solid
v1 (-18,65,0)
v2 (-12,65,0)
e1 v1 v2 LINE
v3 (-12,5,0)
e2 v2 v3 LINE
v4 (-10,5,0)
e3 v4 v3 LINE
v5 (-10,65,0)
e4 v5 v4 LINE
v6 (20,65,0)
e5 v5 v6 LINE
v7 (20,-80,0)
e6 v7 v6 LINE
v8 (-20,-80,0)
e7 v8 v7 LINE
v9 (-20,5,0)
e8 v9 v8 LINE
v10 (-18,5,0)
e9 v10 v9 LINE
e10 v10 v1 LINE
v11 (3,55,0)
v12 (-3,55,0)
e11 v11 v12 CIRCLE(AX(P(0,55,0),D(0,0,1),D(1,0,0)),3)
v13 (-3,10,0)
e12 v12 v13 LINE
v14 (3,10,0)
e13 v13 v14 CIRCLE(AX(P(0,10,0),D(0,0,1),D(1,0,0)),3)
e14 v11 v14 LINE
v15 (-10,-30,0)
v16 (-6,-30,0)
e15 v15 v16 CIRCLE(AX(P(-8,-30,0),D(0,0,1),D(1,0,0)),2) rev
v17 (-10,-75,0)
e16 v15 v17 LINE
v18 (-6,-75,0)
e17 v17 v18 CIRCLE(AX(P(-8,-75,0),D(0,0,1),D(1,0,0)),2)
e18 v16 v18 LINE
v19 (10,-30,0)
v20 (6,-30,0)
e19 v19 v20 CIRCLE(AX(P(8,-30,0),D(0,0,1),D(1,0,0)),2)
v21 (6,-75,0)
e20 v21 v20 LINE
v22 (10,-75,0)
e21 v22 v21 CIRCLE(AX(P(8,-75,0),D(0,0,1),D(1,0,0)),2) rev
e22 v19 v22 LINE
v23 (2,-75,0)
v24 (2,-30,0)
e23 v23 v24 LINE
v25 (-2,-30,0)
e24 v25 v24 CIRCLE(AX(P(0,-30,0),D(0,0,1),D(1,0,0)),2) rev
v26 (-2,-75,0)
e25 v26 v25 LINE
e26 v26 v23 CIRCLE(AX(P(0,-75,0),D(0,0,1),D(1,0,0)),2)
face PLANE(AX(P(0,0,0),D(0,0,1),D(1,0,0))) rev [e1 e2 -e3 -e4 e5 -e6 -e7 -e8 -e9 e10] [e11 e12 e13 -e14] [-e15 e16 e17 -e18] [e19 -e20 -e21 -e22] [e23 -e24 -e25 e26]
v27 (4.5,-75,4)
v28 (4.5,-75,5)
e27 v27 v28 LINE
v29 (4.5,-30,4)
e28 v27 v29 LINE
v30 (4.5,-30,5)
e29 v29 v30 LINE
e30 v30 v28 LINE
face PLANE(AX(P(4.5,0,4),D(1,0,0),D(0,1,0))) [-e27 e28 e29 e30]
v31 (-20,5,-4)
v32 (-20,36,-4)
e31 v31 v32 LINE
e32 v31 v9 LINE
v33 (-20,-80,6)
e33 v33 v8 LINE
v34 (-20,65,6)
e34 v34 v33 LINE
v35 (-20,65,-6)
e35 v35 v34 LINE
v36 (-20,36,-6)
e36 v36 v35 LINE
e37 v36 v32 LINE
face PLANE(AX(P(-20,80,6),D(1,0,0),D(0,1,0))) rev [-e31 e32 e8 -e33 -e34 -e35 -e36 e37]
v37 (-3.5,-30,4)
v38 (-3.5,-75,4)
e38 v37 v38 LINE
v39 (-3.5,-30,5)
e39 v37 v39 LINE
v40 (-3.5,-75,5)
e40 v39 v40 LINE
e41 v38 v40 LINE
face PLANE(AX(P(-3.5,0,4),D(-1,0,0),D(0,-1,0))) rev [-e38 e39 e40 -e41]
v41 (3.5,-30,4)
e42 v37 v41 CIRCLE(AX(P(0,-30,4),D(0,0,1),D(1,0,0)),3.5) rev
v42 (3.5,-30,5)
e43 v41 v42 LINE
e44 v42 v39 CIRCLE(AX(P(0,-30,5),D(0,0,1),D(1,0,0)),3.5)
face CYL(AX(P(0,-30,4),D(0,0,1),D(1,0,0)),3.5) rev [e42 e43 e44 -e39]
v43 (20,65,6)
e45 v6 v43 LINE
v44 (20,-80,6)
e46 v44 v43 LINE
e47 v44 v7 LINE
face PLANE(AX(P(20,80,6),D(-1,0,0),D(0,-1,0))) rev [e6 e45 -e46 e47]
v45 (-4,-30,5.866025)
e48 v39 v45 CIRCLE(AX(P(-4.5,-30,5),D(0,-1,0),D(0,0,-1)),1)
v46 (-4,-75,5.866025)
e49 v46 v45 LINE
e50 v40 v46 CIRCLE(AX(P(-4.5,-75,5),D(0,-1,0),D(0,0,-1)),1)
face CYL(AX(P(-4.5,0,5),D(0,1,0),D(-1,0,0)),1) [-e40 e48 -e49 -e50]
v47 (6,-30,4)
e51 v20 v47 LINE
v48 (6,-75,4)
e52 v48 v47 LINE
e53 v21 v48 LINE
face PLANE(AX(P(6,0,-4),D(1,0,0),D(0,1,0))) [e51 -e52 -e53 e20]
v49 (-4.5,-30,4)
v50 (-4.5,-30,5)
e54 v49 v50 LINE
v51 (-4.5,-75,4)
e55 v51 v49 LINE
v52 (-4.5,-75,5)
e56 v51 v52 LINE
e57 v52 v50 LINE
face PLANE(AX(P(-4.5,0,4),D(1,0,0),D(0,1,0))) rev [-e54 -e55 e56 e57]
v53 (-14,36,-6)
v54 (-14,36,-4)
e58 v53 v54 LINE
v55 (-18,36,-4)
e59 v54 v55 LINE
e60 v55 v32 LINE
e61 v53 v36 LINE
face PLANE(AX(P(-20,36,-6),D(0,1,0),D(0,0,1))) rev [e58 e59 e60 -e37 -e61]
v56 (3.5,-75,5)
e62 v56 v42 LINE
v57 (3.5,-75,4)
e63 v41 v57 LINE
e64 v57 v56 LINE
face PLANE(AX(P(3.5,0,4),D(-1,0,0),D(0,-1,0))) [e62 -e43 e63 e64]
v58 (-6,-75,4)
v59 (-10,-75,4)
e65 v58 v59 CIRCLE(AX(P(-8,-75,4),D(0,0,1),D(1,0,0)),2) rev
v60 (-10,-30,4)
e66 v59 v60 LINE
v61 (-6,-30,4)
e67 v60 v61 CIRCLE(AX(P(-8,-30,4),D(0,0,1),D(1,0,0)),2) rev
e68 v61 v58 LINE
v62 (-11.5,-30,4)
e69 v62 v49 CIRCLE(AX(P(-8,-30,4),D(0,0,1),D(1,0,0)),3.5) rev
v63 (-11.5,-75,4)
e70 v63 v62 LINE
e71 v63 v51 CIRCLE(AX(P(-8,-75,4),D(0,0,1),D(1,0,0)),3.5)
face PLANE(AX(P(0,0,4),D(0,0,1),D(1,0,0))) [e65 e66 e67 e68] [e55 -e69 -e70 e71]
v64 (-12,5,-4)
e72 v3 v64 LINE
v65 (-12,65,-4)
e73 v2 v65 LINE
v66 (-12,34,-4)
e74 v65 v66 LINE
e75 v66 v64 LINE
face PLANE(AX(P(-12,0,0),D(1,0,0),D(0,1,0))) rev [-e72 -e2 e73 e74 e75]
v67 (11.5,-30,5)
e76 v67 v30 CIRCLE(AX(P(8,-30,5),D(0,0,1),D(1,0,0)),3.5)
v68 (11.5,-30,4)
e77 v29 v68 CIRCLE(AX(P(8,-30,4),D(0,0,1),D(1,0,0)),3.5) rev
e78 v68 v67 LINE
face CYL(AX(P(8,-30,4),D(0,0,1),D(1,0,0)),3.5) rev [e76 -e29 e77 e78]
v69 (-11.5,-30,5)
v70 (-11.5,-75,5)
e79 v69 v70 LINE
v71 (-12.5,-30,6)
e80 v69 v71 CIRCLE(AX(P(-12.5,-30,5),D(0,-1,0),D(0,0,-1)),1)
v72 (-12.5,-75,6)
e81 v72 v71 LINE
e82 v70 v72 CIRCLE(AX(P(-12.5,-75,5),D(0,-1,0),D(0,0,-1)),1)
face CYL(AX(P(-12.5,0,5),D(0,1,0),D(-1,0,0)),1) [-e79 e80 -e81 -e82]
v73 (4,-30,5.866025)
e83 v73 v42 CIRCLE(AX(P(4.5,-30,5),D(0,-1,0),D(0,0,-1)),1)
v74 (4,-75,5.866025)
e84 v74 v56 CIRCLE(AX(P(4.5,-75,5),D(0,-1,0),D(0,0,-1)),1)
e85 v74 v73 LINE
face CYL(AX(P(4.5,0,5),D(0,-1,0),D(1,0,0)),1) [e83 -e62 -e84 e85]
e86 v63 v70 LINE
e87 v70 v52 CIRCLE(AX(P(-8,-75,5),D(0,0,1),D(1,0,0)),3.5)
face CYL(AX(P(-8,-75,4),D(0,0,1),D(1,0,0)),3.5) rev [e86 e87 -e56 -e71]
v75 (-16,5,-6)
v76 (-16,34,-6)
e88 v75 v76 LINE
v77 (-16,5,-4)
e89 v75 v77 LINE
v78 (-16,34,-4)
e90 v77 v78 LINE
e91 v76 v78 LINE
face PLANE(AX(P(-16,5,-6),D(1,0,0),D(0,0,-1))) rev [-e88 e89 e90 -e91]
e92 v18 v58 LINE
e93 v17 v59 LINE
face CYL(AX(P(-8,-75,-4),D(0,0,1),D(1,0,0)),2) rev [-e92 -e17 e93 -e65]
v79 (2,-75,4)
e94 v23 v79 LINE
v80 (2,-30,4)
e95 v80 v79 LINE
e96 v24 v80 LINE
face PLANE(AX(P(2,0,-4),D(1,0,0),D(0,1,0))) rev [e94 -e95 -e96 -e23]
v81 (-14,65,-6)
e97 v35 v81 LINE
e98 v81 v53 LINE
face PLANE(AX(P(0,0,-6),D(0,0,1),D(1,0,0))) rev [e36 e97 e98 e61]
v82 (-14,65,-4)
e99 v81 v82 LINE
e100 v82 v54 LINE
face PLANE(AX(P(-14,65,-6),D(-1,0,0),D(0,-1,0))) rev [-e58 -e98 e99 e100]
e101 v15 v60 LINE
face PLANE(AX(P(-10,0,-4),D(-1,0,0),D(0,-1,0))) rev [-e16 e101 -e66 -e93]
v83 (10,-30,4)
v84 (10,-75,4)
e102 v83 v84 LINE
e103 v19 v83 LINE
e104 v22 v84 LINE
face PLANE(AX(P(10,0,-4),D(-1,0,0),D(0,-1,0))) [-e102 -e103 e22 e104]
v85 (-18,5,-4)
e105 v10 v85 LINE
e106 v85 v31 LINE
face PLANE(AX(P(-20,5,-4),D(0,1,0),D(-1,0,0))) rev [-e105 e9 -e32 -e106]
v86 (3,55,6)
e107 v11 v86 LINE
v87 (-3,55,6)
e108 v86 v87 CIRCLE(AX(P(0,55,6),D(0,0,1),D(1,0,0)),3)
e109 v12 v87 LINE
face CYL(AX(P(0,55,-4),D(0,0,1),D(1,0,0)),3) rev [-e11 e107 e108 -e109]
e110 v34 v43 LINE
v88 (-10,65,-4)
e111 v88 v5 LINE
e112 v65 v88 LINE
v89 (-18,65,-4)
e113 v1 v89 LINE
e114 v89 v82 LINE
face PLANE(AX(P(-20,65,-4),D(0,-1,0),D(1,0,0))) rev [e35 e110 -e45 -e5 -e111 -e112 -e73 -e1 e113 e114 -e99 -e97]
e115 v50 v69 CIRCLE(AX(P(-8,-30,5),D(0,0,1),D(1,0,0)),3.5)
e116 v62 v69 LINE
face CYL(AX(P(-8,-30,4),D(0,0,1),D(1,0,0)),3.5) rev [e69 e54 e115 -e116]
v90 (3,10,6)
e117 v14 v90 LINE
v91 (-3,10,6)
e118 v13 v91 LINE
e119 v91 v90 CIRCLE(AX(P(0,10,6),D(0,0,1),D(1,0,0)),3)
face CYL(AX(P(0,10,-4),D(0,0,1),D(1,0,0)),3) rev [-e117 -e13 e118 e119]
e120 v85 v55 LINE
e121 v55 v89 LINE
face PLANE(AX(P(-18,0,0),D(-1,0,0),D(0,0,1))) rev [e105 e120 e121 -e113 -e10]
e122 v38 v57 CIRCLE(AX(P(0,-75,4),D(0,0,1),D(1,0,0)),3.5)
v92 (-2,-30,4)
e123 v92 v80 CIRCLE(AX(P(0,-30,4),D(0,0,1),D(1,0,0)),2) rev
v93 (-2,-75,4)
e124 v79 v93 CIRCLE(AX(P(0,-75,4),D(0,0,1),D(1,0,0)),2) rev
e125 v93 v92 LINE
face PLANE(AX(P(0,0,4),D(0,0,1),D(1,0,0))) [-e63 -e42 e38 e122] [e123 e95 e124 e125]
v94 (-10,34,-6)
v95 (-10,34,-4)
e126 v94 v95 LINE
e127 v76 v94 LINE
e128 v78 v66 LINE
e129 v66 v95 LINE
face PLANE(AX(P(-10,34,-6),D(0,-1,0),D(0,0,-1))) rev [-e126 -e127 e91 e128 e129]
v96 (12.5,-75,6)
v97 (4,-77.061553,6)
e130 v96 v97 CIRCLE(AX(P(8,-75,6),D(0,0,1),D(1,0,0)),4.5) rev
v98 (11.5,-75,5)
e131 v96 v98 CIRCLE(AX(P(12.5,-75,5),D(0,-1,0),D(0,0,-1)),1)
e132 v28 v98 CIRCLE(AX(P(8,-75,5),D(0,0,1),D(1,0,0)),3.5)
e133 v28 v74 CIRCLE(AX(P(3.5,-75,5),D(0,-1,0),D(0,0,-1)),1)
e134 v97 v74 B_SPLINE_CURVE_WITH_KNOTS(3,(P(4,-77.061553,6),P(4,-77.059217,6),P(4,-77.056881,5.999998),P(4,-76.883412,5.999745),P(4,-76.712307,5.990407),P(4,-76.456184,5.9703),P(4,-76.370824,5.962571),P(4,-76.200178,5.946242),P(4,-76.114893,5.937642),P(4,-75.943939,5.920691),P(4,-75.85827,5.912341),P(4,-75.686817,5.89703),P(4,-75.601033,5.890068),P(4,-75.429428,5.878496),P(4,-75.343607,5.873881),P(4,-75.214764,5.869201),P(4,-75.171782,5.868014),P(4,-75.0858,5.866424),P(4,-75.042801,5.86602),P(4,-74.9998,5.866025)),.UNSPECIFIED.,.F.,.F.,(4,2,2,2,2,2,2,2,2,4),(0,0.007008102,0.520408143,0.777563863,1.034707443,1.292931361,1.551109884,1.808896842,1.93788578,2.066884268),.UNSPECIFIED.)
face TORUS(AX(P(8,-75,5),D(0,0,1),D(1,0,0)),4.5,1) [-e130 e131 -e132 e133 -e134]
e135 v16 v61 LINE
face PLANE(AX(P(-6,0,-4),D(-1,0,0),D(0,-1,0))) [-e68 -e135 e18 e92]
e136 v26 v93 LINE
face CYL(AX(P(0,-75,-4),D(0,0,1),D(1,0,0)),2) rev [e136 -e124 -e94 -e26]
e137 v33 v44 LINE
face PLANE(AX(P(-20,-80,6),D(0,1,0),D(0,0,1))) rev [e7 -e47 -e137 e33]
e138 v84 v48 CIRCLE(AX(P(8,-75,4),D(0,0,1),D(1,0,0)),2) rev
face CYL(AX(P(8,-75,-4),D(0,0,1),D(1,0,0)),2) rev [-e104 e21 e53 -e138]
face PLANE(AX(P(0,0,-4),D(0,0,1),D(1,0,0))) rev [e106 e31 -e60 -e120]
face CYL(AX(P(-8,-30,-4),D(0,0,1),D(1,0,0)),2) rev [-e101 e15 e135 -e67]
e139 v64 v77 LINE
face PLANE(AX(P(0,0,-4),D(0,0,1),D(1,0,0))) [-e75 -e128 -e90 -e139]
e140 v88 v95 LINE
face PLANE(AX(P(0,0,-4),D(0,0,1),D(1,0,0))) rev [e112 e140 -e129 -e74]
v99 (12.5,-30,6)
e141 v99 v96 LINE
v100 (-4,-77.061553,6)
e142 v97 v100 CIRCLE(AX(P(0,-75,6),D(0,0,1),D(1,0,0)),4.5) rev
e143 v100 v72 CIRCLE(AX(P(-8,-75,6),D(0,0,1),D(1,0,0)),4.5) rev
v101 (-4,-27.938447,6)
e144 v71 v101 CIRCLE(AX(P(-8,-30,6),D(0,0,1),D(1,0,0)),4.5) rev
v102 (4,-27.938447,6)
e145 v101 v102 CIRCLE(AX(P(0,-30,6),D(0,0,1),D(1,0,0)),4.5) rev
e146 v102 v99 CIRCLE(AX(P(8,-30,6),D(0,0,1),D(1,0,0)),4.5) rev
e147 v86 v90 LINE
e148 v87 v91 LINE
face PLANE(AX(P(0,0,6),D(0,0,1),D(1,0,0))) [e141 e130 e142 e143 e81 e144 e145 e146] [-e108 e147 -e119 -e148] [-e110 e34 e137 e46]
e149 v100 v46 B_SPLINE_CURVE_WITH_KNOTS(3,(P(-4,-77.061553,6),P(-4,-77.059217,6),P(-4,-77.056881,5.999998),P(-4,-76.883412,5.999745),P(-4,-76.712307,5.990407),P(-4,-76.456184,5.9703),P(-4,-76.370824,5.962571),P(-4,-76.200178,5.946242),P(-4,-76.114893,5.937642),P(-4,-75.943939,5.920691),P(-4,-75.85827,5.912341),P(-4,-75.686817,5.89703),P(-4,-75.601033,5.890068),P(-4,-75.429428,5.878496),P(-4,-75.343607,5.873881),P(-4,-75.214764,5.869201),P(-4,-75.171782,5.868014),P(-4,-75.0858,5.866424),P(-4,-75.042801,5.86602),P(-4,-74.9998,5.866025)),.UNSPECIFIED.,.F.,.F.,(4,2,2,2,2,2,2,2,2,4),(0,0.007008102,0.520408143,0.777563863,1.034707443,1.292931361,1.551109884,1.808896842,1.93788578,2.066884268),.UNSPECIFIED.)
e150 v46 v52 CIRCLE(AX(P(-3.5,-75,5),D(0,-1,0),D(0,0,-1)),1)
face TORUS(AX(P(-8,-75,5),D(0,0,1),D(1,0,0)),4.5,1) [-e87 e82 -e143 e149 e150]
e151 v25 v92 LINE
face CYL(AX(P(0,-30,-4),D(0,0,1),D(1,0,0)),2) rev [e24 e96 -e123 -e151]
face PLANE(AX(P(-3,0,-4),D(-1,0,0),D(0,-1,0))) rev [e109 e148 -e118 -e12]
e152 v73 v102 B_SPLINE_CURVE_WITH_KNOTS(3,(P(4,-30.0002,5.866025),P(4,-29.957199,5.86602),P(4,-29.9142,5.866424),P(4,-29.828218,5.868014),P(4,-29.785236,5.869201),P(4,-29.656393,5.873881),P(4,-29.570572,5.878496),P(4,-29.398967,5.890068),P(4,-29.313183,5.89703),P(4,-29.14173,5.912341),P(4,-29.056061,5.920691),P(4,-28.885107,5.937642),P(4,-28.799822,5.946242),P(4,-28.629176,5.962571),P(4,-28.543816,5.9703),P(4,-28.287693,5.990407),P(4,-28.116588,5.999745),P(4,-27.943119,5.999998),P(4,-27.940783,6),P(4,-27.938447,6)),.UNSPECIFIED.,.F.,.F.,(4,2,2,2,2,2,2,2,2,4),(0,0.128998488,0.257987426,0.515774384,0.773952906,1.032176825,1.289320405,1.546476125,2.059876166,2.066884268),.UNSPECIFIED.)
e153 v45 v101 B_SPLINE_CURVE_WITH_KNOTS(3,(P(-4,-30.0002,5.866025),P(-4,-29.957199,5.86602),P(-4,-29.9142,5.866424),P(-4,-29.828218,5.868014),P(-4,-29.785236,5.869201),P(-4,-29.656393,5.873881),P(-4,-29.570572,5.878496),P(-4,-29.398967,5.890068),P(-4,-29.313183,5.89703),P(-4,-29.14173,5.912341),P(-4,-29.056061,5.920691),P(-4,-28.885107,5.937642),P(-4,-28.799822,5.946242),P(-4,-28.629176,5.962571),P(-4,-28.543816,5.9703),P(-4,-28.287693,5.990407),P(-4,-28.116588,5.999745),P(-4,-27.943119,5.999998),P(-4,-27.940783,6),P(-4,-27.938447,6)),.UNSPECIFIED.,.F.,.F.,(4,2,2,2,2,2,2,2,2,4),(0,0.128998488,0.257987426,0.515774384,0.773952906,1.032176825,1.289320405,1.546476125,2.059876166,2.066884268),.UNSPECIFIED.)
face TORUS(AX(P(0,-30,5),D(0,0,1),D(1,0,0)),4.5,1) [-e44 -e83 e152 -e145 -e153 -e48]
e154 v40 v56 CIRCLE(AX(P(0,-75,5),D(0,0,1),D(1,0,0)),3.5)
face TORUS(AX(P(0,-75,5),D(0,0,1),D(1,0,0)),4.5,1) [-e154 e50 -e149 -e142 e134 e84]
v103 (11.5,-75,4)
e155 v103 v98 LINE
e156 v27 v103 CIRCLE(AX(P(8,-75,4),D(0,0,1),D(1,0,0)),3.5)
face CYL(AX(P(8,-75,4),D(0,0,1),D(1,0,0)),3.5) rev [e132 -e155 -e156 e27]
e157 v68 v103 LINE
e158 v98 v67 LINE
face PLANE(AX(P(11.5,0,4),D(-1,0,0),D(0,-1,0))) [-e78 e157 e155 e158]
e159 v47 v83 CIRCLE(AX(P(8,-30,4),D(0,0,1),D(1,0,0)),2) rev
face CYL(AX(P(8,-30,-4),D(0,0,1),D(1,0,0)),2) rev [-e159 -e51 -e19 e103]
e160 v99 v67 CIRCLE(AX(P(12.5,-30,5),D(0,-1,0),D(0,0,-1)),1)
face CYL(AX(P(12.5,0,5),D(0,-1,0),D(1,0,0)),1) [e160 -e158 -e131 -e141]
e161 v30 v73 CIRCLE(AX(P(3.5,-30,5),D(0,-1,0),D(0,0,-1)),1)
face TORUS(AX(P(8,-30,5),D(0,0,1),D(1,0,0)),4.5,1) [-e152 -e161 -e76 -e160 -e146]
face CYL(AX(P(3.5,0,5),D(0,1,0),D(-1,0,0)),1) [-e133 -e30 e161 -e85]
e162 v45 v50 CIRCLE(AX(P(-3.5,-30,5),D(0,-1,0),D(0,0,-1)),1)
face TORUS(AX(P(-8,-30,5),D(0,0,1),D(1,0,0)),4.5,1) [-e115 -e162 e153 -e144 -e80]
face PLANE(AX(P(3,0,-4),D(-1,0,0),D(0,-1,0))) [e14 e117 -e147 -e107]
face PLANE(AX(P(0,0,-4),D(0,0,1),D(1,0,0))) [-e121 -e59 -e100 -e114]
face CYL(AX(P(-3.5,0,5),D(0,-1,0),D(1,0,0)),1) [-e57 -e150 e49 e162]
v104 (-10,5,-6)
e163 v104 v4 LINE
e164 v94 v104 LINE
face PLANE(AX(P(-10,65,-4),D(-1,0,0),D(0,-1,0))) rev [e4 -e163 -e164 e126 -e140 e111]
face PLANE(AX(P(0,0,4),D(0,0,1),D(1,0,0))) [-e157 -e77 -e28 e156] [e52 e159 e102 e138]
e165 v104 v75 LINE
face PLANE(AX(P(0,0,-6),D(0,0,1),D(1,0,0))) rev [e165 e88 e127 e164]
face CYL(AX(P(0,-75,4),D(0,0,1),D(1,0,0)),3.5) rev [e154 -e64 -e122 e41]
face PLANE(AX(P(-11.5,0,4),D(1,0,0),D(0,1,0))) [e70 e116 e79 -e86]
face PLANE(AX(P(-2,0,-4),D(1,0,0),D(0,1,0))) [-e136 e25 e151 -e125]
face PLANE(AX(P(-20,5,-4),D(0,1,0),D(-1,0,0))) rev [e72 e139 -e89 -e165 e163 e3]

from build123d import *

# Parameters (mm, degrees)
SKETCH_1_W          = 40
SKETCH_1_H          = 160
EXTRUDE_2_DEPTH     = 6
CUT_EXTRUDE_3_DEPTH = 10
SKETCH_5_W          = 40
SKETCH_5_H          = 15
CUT_EXTRUDE_4_DEPTH = 10
CUT_EXTRUDE_5_DEPTH = 10
CUT_EXTRUDE_6_DEPTH = 2
FILLET_1_R          = 1
SKETCH_10_W         = 10
SKETCH_10_H         = 60
EXTRUDE_3_DEPTH     = 4
SKETCH_11_W         = 6
SKETCH_11_H         = 60
CUT_EXTRUDE_7_DEPTH = 4
SKETCH_13_W         = 6
SKETCH_13_H         = 29
EXTRUDE_9_DEPTH     = 2


with BuildPart() as part:
    # Эскиз1 → Бобышка-Вытянуть2 (new body)
    with BuildSketch(Plane.XY):
        Rectangle(SKETCH_1_W, SKETCH_1_H)
    extrude(amount=EXTRUDE_2_DEPTH)

    # Эскиз3 → Вырез-Вытянуть3 (cut)
    with BuildSketch(Plane.XY.offset(6)):
        with BuildLine():
            Line((-3, 55), (-3, 10))
            ThreePointArc((-3, 10), (0, 7), (3, 10))
            Line((3, 10), (3, 55))
            ThreePointArc((3, 55), (0, 58), (-3, 55))
        make_face()
    extrude(amount=-CUT_EXTRUDE_3_DEPTH, mode=Mode.SUBTRACT)

    # Эскиз5 → Вырез-Вытянуть4 (cut)
    with BuildSketch(Plane.XY.offset(6)):
        with Locations((0, 72.5)):
            Rectangle(SKETCH_5_W, SKETCH_5_H)
    extrude(amount=-CUT_EXTRUDE_4_DEPTH, mode=Mode.SUBTRACT)

    # Эскиз7 → Вырез-Вытянуть5 (cut)
    with BuildSketch(Plane.XY.offset(6)):
        with BuildLine():
            Line((-10, -30), (-10, -75))
            ThreePointArc((-10, -75), (-8, -77), (-6, -75))
            Line((-6, -75), (-6, -30))
            ThreePointArc((-6, -30), (-8, -28), (-10, -30))
        make_face()
        with BuildLine():
            Line((-2, -75), (-2, -30))
            ThreePointArc((-2, -30), (0, -28), (2, -30))
            Line((2, -30), (2, -75))
            ThreePointArc((2, -75), (0, -77), (-2, -75))
        make_face()
        with BuildLine():
            Line((6, -75), (6, -30))
            ThreePointArc((6, -30), (8, -28), (10, -30))
            Line((10, -30), (10, -75))
            ThreePointArc((10, -75), (8, -77), (6, -75))
        make_face()
    extrude(amount=-CUT_EXTRUDE_5_DEPTH, mode=Mode.SUBTRACT)

    # Эскиз8 → Вырез-Вытянуть6 (cut)
    # profile 1 of 3: a face of its own
    with BuildSketch(Plane.XY.offset(6)):
        with BuildLine():
            ThreePointArc((-11.5, -30), (-8, -26.5), (-4.5, -30))
            Line((-4.5, -30), (-4.5, -75))
            ThreePointArc((-4.5, -75), (-8, -78.5), (-11.5, -75))
            Line((-11.5, -75), (-11.5, -30))
        make_face()
        with BuildLine():
            Line((-10, -75), (-10, -30))
            ThreePointArc((-10, -30), (-8, -28), (-6, -30))
            Line((-6, -30), (-6, -75))
            ThreePointArc((-6, -75), (-8, -77), (-10, -75))
        make_face(mode=Mode.SUBTRACT)
    # profile 2 of 3: a face of its own
    with BuildSketch(Plane.XY.offset(6)):
        with BuildLine():
            ThreePointArc((-3.5, -30), (0, -26.5), (3.5, -30))
            Line((3.5, -30), (3.5, -75))
            ThreePointArc((3.5, -75), (0, -78.5), (-3.5, -75))
            Line((-3.5, -75), (-3.5, -30))
        make_face()
        with BuildLine():
            ThreePointArc((2, -75), (0, -77), (-2, -75))
            Line((-2, -75), (-2, -30))
            ThreePointArc((-2, -30), (0, -28), (2, -30))
            Line((2, -30), (2, -75))
        make_face(mode=Mode.SUBTRACT)
    # profile 3 of 3: a face of its own
    with BuildSketch(Plane.XY.offset(6)):
        with BuildLine():
            ThreePointArc((4.5, -30), (8, -26.5), (11.5, -30))
            Line((11.5, -30), (11.5, -75))
            ThreePointArc((11.5, -75), (8, -78.5), (4.5, -75))
            Line((4.5, -75), (4.5, -30))
        make_face()
        with BuildLine():
            Line((6, -75), (6, -30))
            ThreePointArc((6, -30), (8, -28), (10, -30))
            Line((10, -30), (10, -75))
            ThreePointArc((10, -75), (8, -77), (6, -75))
        make_face(mode=Mode.SUBTRACT)
    extrude(amount=-CUT_EXTRUDE_6_DEPTH, mode=Mode.SUBTRACT)

    # Скругление1
    # the kernel refuses this fillet: 1 mm, written as the material it takes off along each edge
    with BuildSketch(Plane(origin=(-8, -30, 6), x_dir=(-1, 0, 0), z_dir=(0, -1, 0))) as fillet_1_piece_1:
        with BuildLine():
            CenterArc((3.5 + FILLET_1_R, FILLET_1_R), FILLET_1_R, 180, 90)
            Line((3.5, FILLET_1_R), (3.5, 0))
            Line((3.5, 0), (3.5 + FILLET_1_R, 0))
        make_face()
    revolve(axis=Axis((-8, -30, 6), (0, 0, -1)), revolution_arc=180, mode=Mode.SUBTRACT)
    with BuildSketch(Plane(origin=(-11.5, -75, 6), x_dir=(-1, 0, 0), z_dir=(0, 1, 0)), Plane(origin=(-4.5, -30, 6), x_dir=(1, 0, 0), z_dir=(0, -1, 0)), Plane(origin=(3.5, -30, 6), x_dir=(1, 0, 0), z_dir=(0, -1, 0)), Plane(origin=(-3.5, -75, 6), x_dir=(-1, 0, 0), z_dir=(0, 1, 0)), Plane(origin=(11.5, -30, 6), x_dir=(1, 0, 0), z_dir=(0, -1, 0)), Plane(origin=(4.5, -75, 6), x_dir=(-1, 0, 0), z_dir=(0, 1, 0))) as fillet_1_piece_2:
        with BuildLine():
            CenterArc((FILLET_1_R, -FILLET_1_R), FILLET_1_R, 90, 90)
            Line((0, -FILLET_1_R), (0, 0))
            Line((0, 0), (FILLET_1_R, 0))
        make_face()
    extrude(amount=45, mode=Mode.SUBTRACT)
    with BuildSketch(Plane(origin=(-8, -75, 6), x_dir=(1, 0, 0), z_dir=(0, 1, 0))) as fillet_1_piece_3:
        with BuildLine():
            CenterArc((3.5 + FILLET_1_R, FILLET_1_R), FILLET_1_R, 180, 90)
            Line((3.5, FILLET_1_R), (3.5, 0))
            Line((3.5, 0), (3.5 + FILLET_1_R, 0))
        make_face()
    revolve(axis=Axis((-8, -75, 6), (0, 0, -1)), revolution_arc=180, mode=Mode.SUBTRACT)
    with BuildSketch(Plane(origin=(0, -30, 6), x_dir=(-1, 0, 0), z_dir=(0, -1, 0))) as fillet_1_piece_4:
        with BuildLine():
            CenterArc((3.5 + FILLET_1_R, FILLET_1_R), FILLET_1_R, 180, 90)
            Line((3.5, FILLET_1_R), (3.5, 0))
            Line((3.5, 0), (3.5 + FILLET_1_R, 0))
        make_face()
    revolve(axis=Axis((0, -30, 6), (0, 0, -1)), revolution_arc=180, mode=Mode.SUBTRACT)
    with BuildSketch(Plane(origin=(0, -75, 6), x_dir=(1, 0, 0), z_dir=(0, 1, 0))) as fillet_1_piece_5:
        with BuildLine():
            CenterArc((3.5 + FILLET_1_R, FILLET_1_R), FILLET_1_R, 180, 90)
            Line((3.5, FILLET_1_R), (3.5, 0))
            Line((3.5, 0), (3.5 + FILLET_1_R, 0))
        make_face()
    revolve(axis=Axis((0, -75, 6), (0, 0, -1)), revolution_arc=180, mode=Mode.SUBTRACT)
    with BuildSketch(Plane(origin=(8, -30, 6), x_dir=(-1, 0, 0), z_dir=(0, -1, 0))) as fillet_1_piece_6:
        with BuildLine():
            CenterArc((3.5 + FILLET_1_R, FILLET_1_R), FILLET_1_R, 180, 90)
            Line((3.5, FILLET_1_R), (3.5, 0))
            Line((3.5, 0), (3.5 + FILLET_1_R, 0))
        make_face()
    revolve(axis=Axis((8, -30, 6), (0, 0, -1)), revolution_arc=180, mode=Mode.SUBTRACT)
    with BuildSketch(Plane(origin=(8, -75, 6), x_dir=(1, 0, 0), z_dir=(0, 1, 0))) as fillet_1_piece_7:
        with BuildLine():
            CenterArc((3.5 + FILLET_1_R, FILLET_1_R), FILLET_1_R, 180, 90)
            Line((3.5, FILLET_1_R), (3.5, 0))
            Line((3.5, 0), (3.5 + FILLET_1_R, 0))
        make_face()
    revolve(axis=Axis((8, -75, 6), (0, 0, -1)), revolution_arc=180, mode=Mode.SUBTRACT)

    # Эскиз10 → Бобышка-Вытянуть3 (add)
    with BuildSketch(Plane(origin=(0, 0, 0), x_dir=(-1, 0, 0), z_dir=(0, 0, -1))):
        with Locations((15, 35)):
            Rectangle(SKETCH_10_W, SKETCH_10_H)
    extrude(amount=EXTRUDE_3_DEPTH)

    # Эскиз11 → Вырез-Вытянуть7 (cut)
    with BuildSketch(Plane(origin=(0, 0, -4), x_dir=(-1, 0, 0), z_dir=(0, 0, -1))):
        with Locations((15, 35)):
            Rectangle(SKETCH_11_W, SKETCH_11_H)
    extrude(amount=-CUT_EXTRUDE_7_DEPTH, mode=Mode.SUBTRACT)

    # Эскиз13 → Бобышка-Вытянуть9 (add)
    with BuildSketch(Plane(origin=(0, 0, -4), x_dir=(-1, 0, 0), z_dir=(0, 0, -1))):
        with Locations((17, 50.5)):
            Rectangle(SKETCH_13_W, SKETCH_13_H)
        with Locations((13, 19.5)):
            Rectangle(SKETCH_13_W, SKETCH_13_H)
    extrude(amount=EXTRUDE_9_DEPTH)


solid = part.part
